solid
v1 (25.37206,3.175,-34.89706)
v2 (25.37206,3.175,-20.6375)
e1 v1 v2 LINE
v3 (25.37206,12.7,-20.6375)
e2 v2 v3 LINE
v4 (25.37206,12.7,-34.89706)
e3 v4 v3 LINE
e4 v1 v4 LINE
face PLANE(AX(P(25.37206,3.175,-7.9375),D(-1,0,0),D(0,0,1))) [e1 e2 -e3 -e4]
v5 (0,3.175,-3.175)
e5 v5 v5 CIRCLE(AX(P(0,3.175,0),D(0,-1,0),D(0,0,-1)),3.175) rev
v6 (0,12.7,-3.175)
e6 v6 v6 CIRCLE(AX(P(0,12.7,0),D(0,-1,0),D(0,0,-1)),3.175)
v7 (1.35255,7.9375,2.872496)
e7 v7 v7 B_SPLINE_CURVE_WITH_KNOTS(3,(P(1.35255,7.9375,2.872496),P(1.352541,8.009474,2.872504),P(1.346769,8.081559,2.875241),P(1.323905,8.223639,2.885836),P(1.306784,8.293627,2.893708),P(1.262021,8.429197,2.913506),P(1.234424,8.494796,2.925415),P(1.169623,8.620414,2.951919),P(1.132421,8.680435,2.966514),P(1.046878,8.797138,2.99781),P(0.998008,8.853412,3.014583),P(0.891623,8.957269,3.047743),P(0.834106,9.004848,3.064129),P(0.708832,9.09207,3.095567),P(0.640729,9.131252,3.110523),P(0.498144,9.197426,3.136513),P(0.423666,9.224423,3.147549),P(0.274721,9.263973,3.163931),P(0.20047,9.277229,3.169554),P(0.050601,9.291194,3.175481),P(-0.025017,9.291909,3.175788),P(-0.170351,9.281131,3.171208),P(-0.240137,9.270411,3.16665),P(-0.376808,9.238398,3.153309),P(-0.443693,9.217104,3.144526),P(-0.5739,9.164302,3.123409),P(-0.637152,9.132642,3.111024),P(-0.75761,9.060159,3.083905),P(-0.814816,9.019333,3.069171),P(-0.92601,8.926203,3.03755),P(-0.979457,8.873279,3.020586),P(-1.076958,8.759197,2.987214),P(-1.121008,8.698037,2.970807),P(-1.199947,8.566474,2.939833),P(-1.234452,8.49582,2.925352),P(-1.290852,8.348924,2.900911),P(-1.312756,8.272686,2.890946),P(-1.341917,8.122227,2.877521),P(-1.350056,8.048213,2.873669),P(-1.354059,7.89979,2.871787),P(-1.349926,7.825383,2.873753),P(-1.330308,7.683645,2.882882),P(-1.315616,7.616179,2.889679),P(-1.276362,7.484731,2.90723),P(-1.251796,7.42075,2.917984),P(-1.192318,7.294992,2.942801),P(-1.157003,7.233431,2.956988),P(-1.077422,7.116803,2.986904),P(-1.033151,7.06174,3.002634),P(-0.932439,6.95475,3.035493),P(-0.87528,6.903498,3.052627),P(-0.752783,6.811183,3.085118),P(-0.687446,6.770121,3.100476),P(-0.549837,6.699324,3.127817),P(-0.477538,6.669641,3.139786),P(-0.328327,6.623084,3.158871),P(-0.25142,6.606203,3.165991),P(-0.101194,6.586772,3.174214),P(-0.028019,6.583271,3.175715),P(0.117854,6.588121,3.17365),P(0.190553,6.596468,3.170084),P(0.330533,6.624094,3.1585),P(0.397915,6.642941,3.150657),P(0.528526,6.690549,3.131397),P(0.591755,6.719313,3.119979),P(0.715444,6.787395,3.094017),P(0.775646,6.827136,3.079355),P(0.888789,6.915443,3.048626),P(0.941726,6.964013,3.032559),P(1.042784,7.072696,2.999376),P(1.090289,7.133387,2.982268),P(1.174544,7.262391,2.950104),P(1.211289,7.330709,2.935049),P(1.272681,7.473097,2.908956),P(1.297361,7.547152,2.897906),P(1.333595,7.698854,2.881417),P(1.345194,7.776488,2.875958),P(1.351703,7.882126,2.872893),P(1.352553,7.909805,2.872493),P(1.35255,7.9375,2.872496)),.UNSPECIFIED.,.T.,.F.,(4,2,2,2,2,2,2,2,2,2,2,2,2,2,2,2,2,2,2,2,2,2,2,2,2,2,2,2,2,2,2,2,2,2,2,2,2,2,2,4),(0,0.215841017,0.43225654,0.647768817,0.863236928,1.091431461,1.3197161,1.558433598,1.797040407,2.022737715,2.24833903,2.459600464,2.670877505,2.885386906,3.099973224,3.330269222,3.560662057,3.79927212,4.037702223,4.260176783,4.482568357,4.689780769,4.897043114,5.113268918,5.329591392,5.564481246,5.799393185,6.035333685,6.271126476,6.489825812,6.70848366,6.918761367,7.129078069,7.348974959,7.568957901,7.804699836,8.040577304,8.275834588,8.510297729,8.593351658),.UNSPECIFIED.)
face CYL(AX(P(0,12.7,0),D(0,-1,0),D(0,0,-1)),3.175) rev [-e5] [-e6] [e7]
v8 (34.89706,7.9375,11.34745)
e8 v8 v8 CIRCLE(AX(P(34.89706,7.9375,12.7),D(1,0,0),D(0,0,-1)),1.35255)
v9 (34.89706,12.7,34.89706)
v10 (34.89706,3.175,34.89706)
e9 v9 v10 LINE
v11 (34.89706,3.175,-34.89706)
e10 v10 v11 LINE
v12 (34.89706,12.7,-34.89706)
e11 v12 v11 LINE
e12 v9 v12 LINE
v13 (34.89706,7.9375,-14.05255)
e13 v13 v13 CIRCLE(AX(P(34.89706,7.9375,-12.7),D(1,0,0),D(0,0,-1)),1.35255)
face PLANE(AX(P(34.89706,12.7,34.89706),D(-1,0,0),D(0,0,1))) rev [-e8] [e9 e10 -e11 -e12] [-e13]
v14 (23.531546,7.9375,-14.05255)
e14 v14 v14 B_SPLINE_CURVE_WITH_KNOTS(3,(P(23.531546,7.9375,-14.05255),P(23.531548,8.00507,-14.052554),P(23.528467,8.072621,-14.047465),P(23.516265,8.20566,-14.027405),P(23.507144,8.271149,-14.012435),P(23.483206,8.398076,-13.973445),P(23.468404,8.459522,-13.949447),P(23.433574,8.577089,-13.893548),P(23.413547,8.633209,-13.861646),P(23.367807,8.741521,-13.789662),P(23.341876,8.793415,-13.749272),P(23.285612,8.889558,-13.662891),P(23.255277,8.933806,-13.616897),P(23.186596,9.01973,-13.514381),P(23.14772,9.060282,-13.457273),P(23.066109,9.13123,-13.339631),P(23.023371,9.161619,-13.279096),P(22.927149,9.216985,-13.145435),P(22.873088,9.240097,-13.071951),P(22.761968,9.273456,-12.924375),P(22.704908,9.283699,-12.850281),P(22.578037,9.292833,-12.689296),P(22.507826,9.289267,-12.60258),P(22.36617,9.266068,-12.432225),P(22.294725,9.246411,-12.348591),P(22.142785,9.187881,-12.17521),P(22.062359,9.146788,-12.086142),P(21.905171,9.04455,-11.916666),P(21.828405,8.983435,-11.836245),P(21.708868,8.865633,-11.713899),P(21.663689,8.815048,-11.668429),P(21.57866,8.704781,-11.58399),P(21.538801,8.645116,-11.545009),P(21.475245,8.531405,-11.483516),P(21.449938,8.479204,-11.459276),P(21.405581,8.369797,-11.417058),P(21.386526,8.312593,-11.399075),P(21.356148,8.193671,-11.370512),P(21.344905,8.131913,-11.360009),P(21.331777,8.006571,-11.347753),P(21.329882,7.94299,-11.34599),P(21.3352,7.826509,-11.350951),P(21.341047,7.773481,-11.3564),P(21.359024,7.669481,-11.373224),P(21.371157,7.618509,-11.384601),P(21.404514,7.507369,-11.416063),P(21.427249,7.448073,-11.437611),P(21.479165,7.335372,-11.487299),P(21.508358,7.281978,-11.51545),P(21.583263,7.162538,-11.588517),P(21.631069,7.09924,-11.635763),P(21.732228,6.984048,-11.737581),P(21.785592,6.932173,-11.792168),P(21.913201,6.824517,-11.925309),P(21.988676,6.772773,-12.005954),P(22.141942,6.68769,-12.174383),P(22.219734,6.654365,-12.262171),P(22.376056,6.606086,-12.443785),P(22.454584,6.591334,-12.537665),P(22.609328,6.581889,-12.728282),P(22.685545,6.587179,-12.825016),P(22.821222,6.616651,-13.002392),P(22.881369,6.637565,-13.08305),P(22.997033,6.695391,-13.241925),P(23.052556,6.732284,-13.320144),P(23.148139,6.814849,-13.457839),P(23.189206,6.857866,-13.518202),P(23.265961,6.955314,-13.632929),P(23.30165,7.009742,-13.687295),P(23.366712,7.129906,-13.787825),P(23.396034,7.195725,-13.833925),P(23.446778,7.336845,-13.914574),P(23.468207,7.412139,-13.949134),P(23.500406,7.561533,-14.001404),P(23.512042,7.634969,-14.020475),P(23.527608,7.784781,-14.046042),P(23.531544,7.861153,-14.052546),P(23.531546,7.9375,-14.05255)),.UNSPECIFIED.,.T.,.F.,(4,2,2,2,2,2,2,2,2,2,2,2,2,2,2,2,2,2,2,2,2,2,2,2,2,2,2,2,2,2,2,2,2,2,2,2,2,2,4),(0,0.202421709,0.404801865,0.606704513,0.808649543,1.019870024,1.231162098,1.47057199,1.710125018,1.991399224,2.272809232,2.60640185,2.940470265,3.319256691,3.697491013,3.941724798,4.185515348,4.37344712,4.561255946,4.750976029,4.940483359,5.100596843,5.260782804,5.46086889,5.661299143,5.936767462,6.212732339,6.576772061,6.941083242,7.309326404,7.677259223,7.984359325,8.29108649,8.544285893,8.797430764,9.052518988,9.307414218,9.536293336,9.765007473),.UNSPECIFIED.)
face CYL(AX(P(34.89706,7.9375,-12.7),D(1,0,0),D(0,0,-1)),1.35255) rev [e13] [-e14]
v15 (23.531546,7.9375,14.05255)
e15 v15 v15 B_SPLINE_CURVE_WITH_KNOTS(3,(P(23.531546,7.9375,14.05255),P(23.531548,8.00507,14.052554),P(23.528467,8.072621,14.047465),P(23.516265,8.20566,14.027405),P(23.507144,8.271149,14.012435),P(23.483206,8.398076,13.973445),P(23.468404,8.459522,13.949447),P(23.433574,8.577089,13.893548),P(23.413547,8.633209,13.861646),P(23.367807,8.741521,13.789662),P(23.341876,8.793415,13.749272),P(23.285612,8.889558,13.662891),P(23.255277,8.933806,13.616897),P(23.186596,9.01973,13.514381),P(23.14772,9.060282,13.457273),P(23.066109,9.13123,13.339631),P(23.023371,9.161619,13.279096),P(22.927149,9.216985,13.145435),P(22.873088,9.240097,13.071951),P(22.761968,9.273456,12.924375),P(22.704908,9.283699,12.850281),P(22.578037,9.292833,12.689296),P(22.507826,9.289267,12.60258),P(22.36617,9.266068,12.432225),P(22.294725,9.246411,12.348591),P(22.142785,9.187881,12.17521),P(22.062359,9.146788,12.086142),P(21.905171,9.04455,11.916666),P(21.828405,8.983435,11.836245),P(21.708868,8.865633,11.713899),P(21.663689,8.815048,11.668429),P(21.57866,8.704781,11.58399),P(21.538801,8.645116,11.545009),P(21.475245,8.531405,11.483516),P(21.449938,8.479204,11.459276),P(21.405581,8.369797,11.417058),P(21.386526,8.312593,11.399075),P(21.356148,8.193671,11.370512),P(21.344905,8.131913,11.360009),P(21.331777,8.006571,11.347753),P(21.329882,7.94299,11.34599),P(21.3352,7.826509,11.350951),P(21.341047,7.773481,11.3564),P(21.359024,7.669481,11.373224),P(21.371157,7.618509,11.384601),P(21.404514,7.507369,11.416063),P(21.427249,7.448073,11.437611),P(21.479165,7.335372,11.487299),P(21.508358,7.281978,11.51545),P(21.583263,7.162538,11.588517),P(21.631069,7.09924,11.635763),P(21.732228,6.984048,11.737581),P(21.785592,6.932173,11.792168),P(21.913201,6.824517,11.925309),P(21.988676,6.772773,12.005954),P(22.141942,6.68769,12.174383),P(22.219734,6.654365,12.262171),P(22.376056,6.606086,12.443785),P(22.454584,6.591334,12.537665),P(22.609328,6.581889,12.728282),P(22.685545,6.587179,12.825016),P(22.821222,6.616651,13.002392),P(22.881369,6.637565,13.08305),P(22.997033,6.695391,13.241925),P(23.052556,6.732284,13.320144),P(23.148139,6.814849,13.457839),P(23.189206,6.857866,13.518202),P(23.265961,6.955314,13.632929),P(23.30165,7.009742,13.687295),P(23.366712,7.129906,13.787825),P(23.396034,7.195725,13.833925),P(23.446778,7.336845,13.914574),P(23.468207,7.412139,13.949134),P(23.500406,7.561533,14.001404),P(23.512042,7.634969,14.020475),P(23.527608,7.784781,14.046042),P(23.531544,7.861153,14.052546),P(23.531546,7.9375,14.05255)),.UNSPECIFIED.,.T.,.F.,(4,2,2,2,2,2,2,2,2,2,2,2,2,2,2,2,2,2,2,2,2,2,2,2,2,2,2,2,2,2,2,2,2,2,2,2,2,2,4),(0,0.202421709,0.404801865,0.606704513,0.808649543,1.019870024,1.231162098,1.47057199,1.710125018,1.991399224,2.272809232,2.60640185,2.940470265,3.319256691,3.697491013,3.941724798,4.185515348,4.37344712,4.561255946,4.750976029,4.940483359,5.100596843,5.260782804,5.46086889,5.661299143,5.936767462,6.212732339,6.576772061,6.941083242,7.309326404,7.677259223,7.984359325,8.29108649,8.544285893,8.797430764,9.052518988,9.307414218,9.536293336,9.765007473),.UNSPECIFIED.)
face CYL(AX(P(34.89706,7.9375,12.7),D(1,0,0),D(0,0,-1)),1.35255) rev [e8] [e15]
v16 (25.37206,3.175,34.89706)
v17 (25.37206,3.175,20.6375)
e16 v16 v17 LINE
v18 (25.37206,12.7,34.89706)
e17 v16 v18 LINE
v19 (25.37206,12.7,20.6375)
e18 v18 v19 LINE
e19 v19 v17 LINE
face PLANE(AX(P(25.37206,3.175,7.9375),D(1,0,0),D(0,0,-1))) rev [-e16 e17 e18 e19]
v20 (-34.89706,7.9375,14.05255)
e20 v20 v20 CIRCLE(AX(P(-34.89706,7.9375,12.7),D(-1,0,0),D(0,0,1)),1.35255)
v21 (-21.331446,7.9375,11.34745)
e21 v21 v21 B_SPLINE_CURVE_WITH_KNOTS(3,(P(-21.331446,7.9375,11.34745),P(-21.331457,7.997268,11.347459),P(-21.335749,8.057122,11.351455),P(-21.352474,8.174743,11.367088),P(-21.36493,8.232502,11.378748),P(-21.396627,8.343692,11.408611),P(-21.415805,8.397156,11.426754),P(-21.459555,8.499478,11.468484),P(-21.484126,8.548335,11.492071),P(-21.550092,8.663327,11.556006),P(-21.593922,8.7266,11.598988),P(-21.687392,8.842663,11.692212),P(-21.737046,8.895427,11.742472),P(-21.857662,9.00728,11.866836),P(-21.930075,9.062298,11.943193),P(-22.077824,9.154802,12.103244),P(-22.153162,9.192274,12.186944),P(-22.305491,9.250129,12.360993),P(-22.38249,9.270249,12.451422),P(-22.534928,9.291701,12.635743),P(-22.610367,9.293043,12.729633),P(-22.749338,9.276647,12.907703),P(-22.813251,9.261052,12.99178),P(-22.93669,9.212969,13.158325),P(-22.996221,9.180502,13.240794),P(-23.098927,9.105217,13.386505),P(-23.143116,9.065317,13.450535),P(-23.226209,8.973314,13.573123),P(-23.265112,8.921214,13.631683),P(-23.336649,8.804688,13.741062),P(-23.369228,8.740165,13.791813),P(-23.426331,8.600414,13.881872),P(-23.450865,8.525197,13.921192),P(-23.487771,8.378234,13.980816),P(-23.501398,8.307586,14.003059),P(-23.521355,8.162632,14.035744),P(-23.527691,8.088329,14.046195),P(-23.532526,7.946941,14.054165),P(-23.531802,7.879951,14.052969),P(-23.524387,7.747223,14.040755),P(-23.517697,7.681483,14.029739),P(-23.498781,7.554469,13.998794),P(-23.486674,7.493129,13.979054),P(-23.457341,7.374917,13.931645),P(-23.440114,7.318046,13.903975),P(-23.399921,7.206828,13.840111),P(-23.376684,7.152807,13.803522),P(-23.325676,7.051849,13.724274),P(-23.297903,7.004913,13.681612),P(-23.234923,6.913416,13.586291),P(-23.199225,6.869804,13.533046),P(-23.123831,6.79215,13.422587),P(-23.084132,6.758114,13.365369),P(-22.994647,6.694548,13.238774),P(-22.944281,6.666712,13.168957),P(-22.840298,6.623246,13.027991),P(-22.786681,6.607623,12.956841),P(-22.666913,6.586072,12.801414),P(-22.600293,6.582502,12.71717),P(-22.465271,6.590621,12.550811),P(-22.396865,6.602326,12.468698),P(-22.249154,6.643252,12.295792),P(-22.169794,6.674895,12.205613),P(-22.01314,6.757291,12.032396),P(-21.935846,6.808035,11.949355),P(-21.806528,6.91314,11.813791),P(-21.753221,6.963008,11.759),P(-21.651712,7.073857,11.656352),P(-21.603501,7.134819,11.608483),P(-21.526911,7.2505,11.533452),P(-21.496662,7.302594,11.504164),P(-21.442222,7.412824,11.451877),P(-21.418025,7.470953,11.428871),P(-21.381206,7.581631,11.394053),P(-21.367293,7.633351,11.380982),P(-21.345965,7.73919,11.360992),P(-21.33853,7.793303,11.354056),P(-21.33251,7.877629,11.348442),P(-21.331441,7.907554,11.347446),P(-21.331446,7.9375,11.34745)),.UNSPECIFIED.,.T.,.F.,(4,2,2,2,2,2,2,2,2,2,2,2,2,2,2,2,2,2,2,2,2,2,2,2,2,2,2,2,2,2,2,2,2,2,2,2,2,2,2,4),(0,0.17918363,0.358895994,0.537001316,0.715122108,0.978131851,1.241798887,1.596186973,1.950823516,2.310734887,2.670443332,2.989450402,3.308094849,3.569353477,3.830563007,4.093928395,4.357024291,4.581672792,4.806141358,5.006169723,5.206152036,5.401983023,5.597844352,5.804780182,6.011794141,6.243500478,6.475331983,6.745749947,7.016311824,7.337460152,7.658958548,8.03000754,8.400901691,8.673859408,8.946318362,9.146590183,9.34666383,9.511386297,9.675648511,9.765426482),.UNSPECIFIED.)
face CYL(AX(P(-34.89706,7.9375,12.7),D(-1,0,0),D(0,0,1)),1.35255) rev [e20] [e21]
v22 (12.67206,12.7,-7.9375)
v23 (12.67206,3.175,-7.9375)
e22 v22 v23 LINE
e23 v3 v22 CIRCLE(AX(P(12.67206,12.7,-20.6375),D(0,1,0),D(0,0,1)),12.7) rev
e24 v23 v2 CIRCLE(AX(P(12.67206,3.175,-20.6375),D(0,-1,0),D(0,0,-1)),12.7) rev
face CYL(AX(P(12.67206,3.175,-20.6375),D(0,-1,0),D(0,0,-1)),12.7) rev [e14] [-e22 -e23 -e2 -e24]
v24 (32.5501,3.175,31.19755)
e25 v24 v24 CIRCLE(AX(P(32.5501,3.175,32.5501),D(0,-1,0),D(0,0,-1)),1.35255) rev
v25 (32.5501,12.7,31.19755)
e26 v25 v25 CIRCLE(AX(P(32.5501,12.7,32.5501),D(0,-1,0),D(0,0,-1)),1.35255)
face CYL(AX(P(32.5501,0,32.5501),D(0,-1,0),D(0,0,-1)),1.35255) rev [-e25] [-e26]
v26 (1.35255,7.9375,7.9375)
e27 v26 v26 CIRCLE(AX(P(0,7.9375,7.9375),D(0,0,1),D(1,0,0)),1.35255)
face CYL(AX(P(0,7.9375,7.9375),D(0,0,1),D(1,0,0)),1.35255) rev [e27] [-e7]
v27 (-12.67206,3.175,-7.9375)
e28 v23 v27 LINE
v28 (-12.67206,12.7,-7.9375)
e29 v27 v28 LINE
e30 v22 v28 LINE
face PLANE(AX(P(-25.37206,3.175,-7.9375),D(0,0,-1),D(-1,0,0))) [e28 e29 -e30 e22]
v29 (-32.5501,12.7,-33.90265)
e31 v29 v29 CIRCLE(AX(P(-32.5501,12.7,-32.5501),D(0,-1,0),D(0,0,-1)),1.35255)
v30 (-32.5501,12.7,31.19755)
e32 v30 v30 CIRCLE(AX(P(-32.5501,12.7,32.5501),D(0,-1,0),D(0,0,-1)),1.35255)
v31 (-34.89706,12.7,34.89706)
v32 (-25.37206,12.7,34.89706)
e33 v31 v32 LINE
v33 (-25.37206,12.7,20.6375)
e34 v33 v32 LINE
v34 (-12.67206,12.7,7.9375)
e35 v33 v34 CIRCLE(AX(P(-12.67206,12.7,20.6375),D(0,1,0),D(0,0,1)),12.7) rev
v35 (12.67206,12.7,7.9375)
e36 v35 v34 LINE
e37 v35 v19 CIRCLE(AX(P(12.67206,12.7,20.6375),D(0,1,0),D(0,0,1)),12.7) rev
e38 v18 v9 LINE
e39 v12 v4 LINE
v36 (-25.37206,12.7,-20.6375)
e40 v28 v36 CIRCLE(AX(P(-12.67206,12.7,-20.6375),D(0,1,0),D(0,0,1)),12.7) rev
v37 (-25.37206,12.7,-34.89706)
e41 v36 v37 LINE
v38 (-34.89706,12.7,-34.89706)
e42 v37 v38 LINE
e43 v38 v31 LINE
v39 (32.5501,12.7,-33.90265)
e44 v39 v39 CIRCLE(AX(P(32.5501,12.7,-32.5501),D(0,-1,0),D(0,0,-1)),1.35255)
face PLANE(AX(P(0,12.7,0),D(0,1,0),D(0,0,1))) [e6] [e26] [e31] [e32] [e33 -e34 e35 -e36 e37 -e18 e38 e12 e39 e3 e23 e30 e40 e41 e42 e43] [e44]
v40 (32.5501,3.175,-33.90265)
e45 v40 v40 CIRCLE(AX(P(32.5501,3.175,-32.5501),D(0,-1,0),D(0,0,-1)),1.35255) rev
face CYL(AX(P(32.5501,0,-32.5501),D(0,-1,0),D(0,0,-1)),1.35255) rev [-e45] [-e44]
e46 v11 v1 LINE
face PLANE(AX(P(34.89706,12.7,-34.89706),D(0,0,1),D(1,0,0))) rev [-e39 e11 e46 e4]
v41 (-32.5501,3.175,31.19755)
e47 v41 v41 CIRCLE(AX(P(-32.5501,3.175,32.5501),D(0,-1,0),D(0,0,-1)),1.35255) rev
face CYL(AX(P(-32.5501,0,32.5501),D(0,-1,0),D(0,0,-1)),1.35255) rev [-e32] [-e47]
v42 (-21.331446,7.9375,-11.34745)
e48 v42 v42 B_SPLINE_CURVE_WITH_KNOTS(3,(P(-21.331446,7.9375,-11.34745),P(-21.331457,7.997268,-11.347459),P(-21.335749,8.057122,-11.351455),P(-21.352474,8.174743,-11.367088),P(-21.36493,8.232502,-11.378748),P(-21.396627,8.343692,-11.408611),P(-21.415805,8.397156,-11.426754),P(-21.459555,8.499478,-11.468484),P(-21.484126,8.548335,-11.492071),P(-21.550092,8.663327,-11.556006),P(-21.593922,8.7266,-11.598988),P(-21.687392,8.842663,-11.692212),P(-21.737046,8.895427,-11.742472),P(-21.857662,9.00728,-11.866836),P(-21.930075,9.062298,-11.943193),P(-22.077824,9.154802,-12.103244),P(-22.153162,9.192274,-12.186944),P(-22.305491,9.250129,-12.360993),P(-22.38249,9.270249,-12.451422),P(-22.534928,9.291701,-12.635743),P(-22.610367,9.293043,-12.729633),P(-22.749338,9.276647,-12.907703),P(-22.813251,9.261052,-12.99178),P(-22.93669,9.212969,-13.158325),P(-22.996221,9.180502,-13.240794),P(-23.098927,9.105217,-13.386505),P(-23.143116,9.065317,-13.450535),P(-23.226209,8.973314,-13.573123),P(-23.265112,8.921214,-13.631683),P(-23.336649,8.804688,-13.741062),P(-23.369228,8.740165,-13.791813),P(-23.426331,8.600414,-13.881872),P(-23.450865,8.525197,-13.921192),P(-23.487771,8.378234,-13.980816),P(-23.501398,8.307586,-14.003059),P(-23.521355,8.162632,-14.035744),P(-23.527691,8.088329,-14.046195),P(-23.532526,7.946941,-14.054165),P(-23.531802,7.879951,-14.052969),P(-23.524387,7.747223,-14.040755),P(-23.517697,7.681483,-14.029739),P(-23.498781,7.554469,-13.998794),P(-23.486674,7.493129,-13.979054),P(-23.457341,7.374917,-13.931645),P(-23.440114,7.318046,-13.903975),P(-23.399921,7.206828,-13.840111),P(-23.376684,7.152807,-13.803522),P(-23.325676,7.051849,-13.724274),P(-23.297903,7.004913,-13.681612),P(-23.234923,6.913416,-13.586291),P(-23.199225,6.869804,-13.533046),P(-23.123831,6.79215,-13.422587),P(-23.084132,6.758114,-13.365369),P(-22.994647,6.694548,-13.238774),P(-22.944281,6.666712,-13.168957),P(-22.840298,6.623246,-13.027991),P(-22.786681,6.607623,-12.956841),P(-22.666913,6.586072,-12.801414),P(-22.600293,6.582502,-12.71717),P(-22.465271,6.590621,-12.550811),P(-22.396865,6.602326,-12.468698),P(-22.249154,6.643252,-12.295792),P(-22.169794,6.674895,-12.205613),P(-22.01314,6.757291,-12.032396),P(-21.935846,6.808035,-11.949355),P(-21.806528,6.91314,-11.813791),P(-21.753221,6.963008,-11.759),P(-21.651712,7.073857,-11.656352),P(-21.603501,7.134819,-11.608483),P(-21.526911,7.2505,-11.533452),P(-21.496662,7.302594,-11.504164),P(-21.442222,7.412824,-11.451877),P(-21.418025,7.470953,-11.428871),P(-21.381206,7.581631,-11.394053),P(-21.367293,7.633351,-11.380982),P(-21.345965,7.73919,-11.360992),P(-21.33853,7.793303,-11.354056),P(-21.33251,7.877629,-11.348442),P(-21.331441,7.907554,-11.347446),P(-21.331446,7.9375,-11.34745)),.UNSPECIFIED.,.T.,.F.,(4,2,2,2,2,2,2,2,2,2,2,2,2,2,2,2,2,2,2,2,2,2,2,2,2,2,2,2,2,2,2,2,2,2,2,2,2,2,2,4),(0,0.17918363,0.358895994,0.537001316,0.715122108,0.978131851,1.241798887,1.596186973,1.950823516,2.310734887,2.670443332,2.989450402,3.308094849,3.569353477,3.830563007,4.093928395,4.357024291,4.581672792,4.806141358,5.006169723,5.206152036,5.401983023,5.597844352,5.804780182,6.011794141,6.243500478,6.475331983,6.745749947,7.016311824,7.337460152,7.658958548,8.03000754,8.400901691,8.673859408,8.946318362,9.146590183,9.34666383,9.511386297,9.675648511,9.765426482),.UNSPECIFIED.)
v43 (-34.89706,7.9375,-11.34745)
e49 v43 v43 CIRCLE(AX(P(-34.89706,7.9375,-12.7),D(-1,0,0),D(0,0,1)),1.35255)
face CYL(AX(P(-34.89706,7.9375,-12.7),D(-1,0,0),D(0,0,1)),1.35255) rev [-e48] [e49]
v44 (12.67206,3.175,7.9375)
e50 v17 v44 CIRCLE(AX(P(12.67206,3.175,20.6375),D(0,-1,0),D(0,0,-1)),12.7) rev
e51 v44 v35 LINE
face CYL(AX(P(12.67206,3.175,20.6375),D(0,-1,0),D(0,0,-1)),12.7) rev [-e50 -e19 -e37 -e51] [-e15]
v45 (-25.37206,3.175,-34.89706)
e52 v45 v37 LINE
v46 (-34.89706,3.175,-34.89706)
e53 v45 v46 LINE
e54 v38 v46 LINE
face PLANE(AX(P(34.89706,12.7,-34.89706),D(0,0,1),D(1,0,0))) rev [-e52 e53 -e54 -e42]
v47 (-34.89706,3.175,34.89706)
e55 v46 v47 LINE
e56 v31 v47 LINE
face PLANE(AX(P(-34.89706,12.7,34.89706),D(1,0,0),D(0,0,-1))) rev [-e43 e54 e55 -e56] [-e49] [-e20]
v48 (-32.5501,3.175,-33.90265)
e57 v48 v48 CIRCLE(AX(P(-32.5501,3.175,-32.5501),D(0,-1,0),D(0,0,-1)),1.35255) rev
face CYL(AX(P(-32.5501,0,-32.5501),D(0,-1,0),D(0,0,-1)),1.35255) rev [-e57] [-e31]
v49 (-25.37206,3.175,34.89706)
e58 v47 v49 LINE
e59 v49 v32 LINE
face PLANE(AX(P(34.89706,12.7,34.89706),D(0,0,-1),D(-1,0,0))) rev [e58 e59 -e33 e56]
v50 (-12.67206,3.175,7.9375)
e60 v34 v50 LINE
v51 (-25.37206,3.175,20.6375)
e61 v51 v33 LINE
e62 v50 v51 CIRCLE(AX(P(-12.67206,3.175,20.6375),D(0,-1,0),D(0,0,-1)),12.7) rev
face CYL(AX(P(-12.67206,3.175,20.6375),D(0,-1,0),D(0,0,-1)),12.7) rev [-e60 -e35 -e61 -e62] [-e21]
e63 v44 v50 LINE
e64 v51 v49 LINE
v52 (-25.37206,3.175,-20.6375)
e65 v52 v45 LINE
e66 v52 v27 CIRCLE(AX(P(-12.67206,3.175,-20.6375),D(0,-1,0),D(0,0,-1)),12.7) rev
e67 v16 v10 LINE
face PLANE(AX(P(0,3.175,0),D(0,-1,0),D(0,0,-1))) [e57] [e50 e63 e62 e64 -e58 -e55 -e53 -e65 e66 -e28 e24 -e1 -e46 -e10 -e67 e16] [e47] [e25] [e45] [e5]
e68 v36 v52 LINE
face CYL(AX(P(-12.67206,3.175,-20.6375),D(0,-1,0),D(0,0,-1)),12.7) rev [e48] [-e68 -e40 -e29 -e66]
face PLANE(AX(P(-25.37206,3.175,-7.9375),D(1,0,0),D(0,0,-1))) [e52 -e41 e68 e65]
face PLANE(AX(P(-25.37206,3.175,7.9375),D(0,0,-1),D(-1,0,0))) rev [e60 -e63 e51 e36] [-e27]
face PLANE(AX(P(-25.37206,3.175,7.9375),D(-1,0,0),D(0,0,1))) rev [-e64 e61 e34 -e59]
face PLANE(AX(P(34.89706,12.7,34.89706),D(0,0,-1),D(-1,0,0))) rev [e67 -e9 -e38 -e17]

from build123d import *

# Parameters (mm, degrees)
SKETCH1_W                 = 76.2
SKETCH1_H                 = 76.2
BOSS_EXTRUDE1_DEPTH       = 3.175
SKETCH2_W                 = 69.79412
SKETCH2_H                 = 69.79412
BOSS_EXTRUDE2_DEPTH       = 9.525
F_6_32_TAPPED_HOLE1_D     = 2.7051
CIRPATTERN1_COUNT         = 4
SKETCH14_R                = 3.175
CUT_EXTRUDE1_DEPTH        = 56.358016583
SKETCH15_W                = 50.74412
SKETCH15_H                = 26.95956
CUT_EXTRUDE2_DEPTH        = 9.525
FILLET1_R                 = 12.7
F_6_32_TAPPED_HOLE2_D     = 2.7051
F_6_32_TAPPED_HOLE2_DEPTH = 9.652
F_6_32_TAPPED_HOLE2_TIP   = 0.81269403
FILLET1_OF_MIRROR3_R      = 12.7
SKETCH21_W                = 76.2
SKETCH21_H                = 76.2
CUT_EXTRUDE3_DEPTH        = 3.175


with BuildPart() as part:
    # Sketch1 → Boss-Extrude1 (new body)
    with BuildSketch(Plane(origin=(0, 0, 0), x_dir=(1, 0, 0), z_dir=(0, 1, 0))):
        Rectangle(SKETCH1_W, SKETCH1_H)
    extrude(amount=BOSS_EXTRUDE1_DEPTH)

    # Sketch2 → Boss-Extrude2 (add)
    with BuildSketch(Plane(origin=(0, 3.175, 0), x_dir=(1, 0, 0), z_dir=(0, 1, 0))):
        Rectangle(SKETCH2_W, SKETCH2_H)
    extrude(amount=BOSS_EXTRUDE2_DEPTH)

    # Sketch9 → #6-32 Tapped Hole3 (revolve, cut)
    with BuildSketch(Plane(origin=(34.89706, 7.9375, 12.7), x_dir=(0, 0, -1), z_dir=(0, 1, 0))):
        Polygon((0, 0), (0, 11.98869403), (1.35255, 11.176), (1.35255, 0), align=None)
    f_6_32_tapped_hole3 = revolve(axis=Axis((41.24706, 7.9375, 12.7), (-1, 0, 0)), mode=Mode.SUBTRACT)

    # Mirror1: #6-32 Tapped Hole3 across plane
    add(f_6_32_tapped_hole3.mirror(Plane.XY), mode=Mode.SUBTRACT)

    # Mirror2: #6-32 Tapped Hole3 across plane
    add(f_6_32_tapped_hole3.mirror(Plane(origin=(0, 0, 0), x_dir=(0, 0, 1), z_dir=(1, 0, 0))), mode=Mode.SUBTRACT)

    # Mirror2 copy 1 sketch → Mirror2 copy 1 (revolve, cut)
    with BuildSketch(Plane(origin=(-34.89706, 7.9375, -12.7), x_dir=(0, 0, 1), z_dir=(0, 1, 0))):
        Polygon((0, 0), (0, 11.98869403), (1.35255, 11.176), (1.35255, 0), align=None)
    revolve(axis=Axis((-41.24706, 7.9375, -12.7), (1, 0, 0)), mode=Mode.SUBTRACT)

    # #6-32 Tapped Hole1 (through all)
    with Locations(Plane(origin=(0, 0, 0), x_dir=(-1, 0, 0), z_dir=(0, -1, 0))):
        with Locations((-32.5501, 32.5501)):
            f_6_32_tapped_hole1 = Hole(F_6_32_TAPPED_HOLE1_D / 2)

    # CirPattern1: #6-32 Tapped Hole1 ×4 about axis
    cirpattern1_axis = Axis((0, 0, 0), (0, 1, 0))
    for i in range(1, CIRPATTERN1_COUNT):
        add(f_6_32_tapped_hole1.rotate(cirpattern1_axis, i * 360 / CIRPATTERN1_COUNT), mode=Mode.SUBTRACT)

    # Sketch14 → Cut-Extrude1 (cut, through all)
    with BuildSketch(Plane.XZ):
        with Locations(Location((0, 0, 0), (0, 0, 270))):
            Circle(SKETCH14_R)
    extrude(amount=-CUT_EXTRUDE1_DEPTH, mode=Mode.SUBTRACT)

    # Sketch15 → Cut-Extrude2 (cut)
    with BuildSketch(Plane(origin=(0, 12.7, 0), x_dir=(1, 0, 0), z_dir=(0, 1, 0))):
        with Locations((0, -21.41728)):
            Rectangle(SKETCH15_W, SKETCH15_H)
    cut_extrude2 = extrude(amount=-CUT_EXTRUDE2_DEPTH, mode=Mode.SUBTRACT)

    # Fillet1
    # the kernel refuses this fillet: 12.7 mm, written as the material it adds along each edge
    with BuildSketch(Plane(origin=(25.37206, 12.7, 7.9375), x_dir=(0, 0, 1), z_dir=(0, -1, 0))) as fillet1_piece_1_section:
        with BuildLine():
            CenterArc((FILLET1_R, FILLET1_R), FILLET1_R, 180, 90)
            Line((0, FILLET1_R), (0, 0))
            Line((0, 0), (FILLET1_R, 0))
        make_face()
    fillet1_piece_1 = extrude(amount=9.525, mode=Mode.PRIVATE)
    fillet1_piece_1 = fillet1_piece_1 - Plane(origin=(22.423937315, 7.9375, 12.7), x_dir=(0, 0, -1), z_dir=(1, 0, 0)) * Cylinder(1.35255, 70, mode=Mode.PRIVATE)
    add(fillet1_piece_1)
    with BuildSketch(Plane(origin=(-25.37206, 12.7, 7.9375), x_dir=(1, 0, 0), z_dir=(0, -1, 0))) as fillet1_piece_2_section:
        with BuildLine():
            CenterArc((FILLET1_R, FILLET1_R), FILLET1_R, 180, 90)
            Line((0, FILLET1_R), (0, 0))
            Line((0, 0), (FILLET1_R, 0))
        make_face()
    fillet1_piece_2 = extrude(amount=9.525, mode=Mode.PRIVATE)
    fillet1_piece_2 = fillet1_piece_2 - Plane(origin=(-22.423935797, 7.9375, 12.7), x_dir=(0, 0, -1), z_dir=(-1, 0, 0)) * Cylinder(1.35255, 70, mode=Mode.PRIVATE)
    add(fillet1_piece_2)

    # #6-32 Tapped Hole2
    with Locations(Plane.XY.offset(7.9375)):
        with Locations((0, 7.9375)):
            Hole(F_6_32_TAPPED_HOLE2_D / 2, depth=F_6_32_TAPPED_HOLE2_DEPTH)
            with Locations((0, 0, -(F_6_32_TAPPED_HOLE2_DEPTH + F_6_32_TAPPED_HOLE2_TIP / 2))):  # 118° drill point
                Cone(0, F_6_32_TAPPED_HOLE2_D / 2, F_6_32_TAPPED_HOLE2_TIP, mode=Mode.SUBTRACT)

    # Mirror3: Cut-Extrude2 across plane
    add(cut_extrude2.mirror(Plane.XY), mode=Mode.SUBTRACT)

    # Fillet1 of Mirror3
    # the kernel refuses this fillet: 12.7 mm, written as the material it adds along each edge
    with BuildSketch(Plane(origin=(25.37206, 12.7, -7.9375), x_dir=(-1, 0, 0), z_dir=(0, -1, 0))) as fillet1_of_mirror3_piece_1_section:
        with BuildLine():
            CenterArc((FILLET1_OF_MIRROR3_R, FILLET1_OF_MIRROR3_R), FILLET1_OF_MIRROR3_R, 180, 90)
            Line((0, FILLET1_OF_MIRROR3_R), (0, 0))
            Line((0, 0), (FILLET1_OF_MIRROR3_R, 0))
        make_face()
    fillet1_of_mirror3_piece_1 = extrude(amount=9.525, mode=Mode.PRIVATE)
    fillet1_of_mirror3_piece_1 = fillet1_of_mirror3_piece_1 - Plane(origin=(22.423935797, 7.9375, -12.7), x_dir=(0, 0, 1), z_dir=(1, 0, 0)) * Cylinder(1.35255, 70, mode=Mode.PRIVATE)
    add(fillet1_of_mirror3_piece_1)
    with BuildSketch(Plane(origin=(-25.37206, 12.7, -7.9375), x_dir=(0, 0, -1), z_dir=(0, -1, 0))) as fillet1_of_mirror3_piece_2_section:
        with BuildLine():
            CenterArc((FILLET1_OF_MIRROR3_R, FILLET1_OF_MIRROR3_R), FILLET1_OF_MIRROR3_R, 180, 90)
            Line((0, FILLET1_OF_MIRROR3_R), (0, 0))
            Line((0, 0), (FILLET1_OF_MIRROR3_R, 0))
        make_face()
    fillet1_of_mirror3_piece_2 = extrude(amount=9.525, mode=Mode.PRIVATE)
    fillet1_of_mirror3_piece_2 = fillet1_of_mirror3_piece_2 - Plane(origin=(-22.423937315, 7.9375, -12.7), x_dir=(0, 0, 1), z_dir=(-1, 0, 0)) * Cylinder(1.35255, 70, mode=Mode.PRIVATE)
    add(fillet1_of_mirror3_piece_2)

    # Sketch21 → Cut-Extrude3 (cut)
    with BuildSketch(Plane.XZ):
        Rectangle(SKETCH21_W, SKETCH21_H)
    extrude(amount=-CUT_EXTRUDE3_DEPTH, mode=Mode.SUBTRACT)


solid = part.part
